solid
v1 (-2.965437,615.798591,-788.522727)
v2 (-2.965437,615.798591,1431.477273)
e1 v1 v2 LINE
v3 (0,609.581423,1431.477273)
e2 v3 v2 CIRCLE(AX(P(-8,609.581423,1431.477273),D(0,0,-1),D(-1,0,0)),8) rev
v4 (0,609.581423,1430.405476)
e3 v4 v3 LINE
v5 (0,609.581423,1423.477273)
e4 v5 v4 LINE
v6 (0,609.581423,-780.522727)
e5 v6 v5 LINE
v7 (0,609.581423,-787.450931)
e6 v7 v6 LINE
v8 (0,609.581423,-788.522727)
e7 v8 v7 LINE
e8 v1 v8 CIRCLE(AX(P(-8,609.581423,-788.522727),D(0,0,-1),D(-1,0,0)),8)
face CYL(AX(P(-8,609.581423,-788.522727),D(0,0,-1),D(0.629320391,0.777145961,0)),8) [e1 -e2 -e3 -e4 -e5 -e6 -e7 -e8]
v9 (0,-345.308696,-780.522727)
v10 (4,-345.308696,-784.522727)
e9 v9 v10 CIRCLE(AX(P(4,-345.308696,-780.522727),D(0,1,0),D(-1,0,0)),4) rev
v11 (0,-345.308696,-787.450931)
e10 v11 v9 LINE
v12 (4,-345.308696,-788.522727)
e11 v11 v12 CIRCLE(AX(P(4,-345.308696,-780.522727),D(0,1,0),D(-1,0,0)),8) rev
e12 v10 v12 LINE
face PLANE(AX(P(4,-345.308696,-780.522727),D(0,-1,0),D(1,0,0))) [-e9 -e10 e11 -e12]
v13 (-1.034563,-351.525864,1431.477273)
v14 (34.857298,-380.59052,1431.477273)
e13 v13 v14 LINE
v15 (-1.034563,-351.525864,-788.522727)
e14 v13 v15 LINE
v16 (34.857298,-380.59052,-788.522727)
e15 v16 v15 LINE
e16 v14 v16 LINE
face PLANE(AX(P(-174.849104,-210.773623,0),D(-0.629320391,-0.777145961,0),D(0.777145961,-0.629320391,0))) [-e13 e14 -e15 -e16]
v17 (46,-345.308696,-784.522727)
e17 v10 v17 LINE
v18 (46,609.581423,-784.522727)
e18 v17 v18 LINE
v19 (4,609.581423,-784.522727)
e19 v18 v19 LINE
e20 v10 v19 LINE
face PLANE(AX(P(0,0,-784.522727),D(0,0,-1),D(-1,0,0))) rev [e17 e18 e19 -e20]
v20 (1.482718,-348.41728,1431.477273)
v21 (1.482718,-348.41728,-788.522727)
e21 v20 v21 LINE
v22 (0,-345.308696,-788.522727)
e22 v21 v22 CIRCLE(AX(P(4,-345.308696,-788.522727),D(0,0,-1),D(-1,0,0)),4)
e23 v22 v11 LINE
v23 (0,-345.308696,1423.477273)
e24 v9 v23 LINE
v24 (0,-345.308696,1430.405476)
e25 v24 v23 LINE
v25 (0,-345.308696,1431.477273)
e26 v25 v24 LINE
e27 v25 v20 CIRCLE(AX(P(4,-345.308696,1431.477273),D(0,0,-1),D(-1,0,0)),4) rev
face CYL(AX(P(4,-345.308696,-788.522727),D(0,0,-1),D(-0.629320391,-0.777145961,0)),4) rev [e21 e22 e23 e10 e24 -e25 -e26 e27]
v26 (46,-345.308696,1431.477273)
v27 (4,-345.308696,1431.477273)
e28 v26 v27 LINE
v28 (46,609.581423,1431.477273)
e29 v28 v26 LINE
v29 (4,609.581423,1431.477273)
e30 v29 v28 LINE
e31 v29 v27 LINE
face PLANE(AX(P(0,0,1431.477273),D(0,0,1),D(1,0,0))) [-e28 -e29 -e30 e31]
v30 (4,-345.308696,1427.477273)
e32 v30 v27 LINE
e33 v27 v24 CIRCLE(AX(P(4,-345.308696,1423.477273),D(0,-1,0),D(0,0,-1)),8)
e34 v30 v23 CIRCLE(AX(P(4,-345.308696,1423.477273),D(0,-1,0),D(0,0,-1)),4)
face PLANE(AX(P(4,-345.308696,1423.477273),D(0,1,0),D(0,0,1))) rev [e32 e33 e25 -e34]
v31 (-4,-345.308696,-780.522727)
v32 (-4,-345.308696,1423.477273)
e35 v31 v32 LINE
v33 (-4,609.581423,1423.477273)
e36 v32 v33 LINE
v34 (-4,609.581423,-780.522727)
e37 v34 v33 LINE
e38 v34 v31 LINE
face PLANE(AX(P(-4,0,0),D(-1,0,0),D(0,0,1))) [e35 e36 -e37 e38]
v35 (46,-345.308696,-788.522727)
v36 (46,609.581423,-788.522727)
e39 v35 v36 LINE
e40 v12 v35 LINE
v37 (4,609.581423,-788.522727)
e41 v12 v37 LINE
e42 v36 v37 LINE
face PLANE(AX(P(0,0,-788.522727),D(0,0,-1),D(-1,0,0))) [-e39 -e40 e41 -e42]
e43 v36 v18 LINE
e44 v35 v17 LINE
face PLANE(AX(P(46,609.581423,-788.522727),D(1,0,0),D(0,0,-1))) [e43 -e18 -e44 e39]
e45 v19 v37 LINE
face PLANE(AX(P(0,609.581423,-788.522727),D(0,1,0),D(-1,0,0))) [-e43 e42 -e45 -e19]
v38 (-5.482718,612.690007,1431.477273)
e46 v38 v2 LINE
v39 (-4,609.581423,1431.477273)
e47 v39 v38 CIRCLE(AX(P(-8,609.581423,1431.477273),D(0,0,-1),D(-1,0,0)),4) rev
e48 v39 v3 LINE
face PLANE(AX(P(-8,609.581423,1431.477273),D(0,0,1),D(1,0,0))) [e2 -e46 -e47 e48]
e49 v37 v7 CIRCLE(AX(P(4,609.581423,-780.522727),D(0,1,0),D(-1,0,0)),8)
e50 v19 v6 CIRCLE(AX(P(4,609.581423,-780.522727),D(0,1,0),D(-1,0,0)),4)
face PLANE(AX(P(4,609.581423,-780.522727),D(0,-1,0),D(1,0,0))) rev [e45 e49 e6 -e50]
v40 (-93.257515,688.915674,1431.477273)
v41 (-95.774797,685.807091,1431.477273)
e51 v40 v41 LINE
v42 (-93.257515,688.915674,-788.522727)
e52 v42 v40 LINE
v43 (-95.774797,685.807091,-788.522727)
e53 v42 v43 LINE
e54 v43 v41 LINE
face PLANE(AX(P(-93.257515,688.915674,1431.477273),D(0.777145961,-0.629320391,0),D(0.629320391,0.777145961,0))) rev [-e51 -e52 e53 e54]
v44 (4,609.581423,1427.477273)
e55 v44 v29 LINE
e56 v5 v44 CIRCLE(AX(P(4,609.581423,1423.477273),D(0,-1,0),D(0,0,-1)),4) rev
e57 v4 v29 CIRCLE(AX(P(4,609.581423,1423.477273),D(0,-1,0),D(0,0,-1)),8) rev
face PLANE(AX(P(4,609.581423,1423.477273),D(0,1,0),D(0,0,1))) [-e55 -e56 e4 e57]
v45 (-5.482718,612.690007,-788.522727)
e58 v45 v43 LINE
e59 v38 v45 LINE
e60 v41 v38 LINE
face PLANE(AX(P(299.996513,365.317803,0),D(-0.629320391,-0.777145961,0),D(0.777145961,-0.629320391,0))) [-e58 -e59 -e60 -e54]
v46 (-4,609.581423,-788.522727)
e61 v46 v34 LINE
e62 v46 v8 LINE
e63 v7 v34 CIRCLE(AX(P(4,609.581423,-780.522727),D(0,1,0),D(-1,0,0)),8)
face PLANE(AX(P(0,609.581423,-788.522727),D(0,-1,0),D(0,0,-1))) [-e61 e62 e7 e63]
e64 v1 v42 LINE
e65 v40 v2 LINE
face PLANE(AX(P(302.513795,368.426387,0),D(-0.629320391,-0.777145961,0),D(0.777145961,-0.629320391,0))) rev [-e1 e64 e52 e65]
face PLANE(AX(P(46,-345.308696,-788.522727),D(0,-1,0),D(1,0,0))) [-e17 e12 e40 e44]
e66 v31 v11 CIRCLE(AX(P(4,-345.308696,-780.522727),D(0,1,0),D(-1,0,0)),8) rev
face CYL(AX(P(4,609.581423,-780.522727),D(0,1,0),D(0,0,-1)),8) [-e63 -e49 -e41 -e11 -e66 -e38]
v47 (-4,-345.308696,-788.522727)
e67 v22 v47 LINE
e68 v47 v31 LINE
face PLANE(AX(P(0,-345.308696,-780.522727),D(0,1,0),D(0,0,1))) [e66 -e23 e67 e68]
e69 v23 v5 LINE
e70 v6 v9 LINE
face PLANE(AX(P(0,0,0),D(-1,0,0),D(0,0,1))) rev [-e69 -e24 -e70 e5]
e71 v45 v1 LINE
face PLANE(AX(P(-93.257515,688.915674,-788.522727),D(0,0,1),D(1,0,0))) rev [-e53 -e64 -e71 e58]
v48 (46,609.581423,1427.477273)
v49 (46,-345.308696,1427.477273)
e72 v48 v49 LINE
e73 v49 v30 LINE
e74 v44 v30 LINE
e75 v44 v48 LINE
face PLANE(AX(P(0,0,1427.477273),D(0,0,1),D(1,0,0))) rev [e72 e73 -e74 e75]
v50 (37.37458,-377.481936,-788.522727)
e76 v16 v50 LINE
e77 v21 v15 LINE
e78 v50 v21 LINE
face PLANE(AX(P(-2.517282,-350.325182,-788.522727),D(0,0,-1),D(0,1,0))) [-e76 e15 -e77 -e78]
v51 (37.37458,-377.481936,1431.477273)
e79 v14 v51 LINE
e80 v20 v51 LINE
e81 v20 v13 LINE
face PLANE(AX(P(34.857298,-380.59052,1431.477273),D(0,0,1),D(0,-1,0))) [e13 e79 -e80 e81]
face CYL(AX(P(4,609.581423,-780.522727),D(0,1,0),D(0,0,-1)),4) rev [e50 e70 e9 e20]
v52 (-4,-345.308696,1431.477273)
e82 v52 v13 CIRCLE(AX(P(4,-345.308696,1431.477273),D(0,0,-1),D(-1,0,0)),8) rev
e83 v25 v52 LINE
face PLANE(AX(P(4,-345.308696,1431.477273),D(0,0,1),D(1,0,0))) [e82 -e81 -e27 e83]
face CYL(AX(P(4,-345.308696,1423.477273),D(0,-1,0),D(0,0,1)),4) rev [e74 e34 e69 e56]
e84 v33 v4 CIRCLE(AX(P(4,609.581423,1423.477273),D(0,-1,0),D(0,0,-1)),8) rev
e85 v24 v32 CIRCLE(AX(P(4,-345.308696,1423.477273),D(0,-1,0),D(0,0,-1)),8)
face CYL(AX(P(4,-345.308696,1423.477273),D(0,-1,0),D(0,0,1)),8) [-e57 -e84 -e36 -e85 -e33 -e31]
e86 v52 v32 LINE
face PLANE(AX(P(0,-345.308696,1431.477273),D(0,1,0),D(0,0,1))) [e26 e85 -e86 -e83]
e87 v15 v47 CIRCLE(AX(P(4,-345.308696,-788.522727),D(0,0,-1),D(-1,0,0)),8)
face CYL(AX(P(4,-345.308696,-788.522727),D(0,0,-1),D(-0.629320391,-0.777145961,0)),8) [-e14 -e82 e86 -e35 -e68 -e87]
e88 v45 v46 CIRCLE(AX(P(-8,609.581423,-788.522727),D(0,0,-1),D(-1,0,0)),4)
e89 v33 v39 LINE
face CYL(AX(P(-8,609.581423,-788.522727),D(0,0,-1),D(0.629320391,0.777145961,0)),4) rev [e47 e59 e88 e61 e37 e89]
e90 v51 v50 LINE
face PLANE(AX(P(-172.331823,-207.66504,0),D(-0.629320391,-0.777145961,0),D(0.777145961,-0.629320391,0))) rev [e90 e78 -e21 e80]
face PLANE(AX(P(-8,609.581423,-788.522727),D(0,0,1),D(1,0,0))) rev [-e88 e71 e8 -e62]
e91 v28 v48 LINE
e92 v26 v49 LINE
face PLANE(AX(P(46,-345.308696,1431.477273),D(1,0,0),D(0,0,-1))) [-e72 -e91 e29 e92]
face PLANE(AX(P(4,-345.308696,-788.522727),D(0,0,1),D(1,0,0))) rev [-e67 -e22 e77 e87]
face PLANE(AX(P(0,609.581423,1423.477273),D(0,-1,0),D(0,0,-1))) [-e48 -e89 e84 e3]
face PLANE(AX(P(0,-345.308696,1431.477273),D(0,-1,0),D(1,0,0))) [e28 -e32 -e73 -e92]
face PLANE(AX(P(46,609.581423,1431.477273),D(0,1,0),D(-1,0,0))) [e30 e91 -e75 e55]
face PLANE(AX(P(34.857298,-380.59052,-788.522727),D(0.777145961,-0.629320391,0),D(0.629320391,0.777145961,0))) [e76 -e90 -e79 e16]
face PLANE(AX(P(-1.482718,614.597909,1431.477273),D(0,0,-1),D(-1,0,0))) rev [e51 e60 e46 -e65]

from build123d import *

# Parameters (mm, degrees)
SKETCH1_W                    = 2220
SKETCH1_H                    = 969
BASE_FLANGE1_DEPTH           = 4
EDGE_FLANGE1_START           = -788.522727273
EDGE_FLANGE1_DEPTH           = 2220
EDGE_FLANGE1_2_DEPTH         = 2220
EDGE_FLANGE2_START           = -788.522727273
EDGE_FLANGE2_DEPTH           = 2220
EDGE_FLANGE2_2_DEPTH         = 2220
EDGE_FLANGE3_STRIP_W         = 24
EDGE_FLANGE3_STRIP_H         = 4
EDGE_FLANGE3_STRIP_CUT_DEPTH = 954.890119211
EDGE_FLANGE3_DEPTH           = 954.890119211
EDGE_FLANGE4_STRIP_W         = 24
EDGE_FLANGE4_STRIP_H         = 4
EDGE_FLANGE4_STRIP_CUT_DEPTH = 954.890119211
EDGE_FLANGE4_DEPTH           = 954.890119211
CUT_EXTRUDE1_DEPTH           = 1665.285512579
LPATTERN1_COUNT              = 7
LPATTERN1_PITCH              = 300
CUT_EXTRUDE2_DEPTH           = 1665.285512579
CUT_EXTRUDE2_DEPTH_BACK      = 1665.285512579
SKETCH20_R                   = 7
CUT_EXTRUDE3_DEPTH           = 2327.408738422
LPATTERN2_COUNT              = 5
LPATTERN2_PITCH              = 190
CUT_EXTRUDE4_DEPTH           = 1704.883654617
LPATTERN3_COUNT              = 7
LPATTERN3_PITCH              = 300


# Read off the part's stored shape, not the designer's step: Edge-Flange1, Edge-Flange2
# Sheet-metal steps are written as plain solids
with BuildPart() as part:
    # Sketch1 → Base-Flange1 (new body)
    with BuildSketch(Plane(origin=(0, 0, 0), x_dir=(0, 0, -1), z_dir=(1, 0, 0))):
        with Locations((-321.477272727, 132.136363636)):
            Rectangle(SKETCH1_W, SKETCH1_H)
    extrude(amount=-BASE_FLANGE1_DEPTH)

    # Edge-Flange1 outline → Edge-Flange1 (cut)
    with BuildSketch(Plane.XY.offset(EDGE_FLANGE1_START)):
        with BuildLine():
            Line((-4, 616.636363636), (-2.965436872, 615.798590934))
            ThreePointArc((-2.965436872, 615.798590934), (-0.779317725, 613.025512017), (0, 609.581423242))
            Line((0, 609.581423242), (0, 616.636363636))
            Line((0, 616.636363636), (-4, 616.636363636))
        make_face()
    extrude(amount=EDGE_FLANGE1_DEPTH, mode=Mode.SUBTRACT)

    # Edge-Flange1 2 outline → Edge-Flange1 2 (add)
    with BuildSketch(Plane.XY.offset(EDGE_FLANGE1_START)):
        with BuildLine():
            Line((-4, 609.581423242), (-4, 616.636363636))
            Line((-4, 616.636363636), (-93.257515375, 688.91567443))
            Line((-93.257515375, 688.91567443), (-95.774796939, 685.807090584))
            Line((-95.774796939, 685.807090584), (-5.482718436, 612.690007088))
            ThreePointArc((-5.482718436, 612.690007088), (-4.389658863, 611.303467629), (-4, 609.581423242))
        make_face()
    extrude(amount=EDGE_FLANGE1_2_DEPTH)

    # Edge-Flange2 outline → Edge-Flange2 (cut)
    with BuildSketch(Plane.XY.offset(EDGE_FLANGE2_START)):
        with BuildLine():
            Line((0, -352.363636364), (-1.034563128, -351.525863661))
            ThreePointArc((-1.034563128, -351.525863661), (-3.220682275, -348.752784744), (-4, -345.308695969))
            Line((-4, -345.308695969), (-4, -352.363636364))
            Line((-4, -352.363636364), (0, -352.363636364))
        make_face()
    extrude(amount=EDGE_FLANGE2_DEPTH, mode=Mode.SUBTRACT)

    # Edge-Flange2 2 outline → Edge-Flange2 2 (add)
    with BuildSketch(Plane.XY.offset(EDGE_FLANGE2_START)):
        with BuildLine():
            Line((0, -345.308695969), (0, -352.363636364))
            Line((0, -352.363636364), (34.857298073, -380.590519783))
            Line((34.857298073, -380.590519783), (37.374579637, -377.481935938))
            Line((37.374579637, -377.481935938), (1.482718436, -348.417279815))
            ThreePointArc((1.482718436, -348.417279815), (0.389658863, -347.030740356), (0, -345.308695969))
        make_face()
    extrude(amount=EDGE_FLANGE2_2_DEPTH)

    # Edge-Flange3 strip (across the edge) → Edge-Flange3 strip cut (cut)
    with BuildSketch(Plane(origin=(0, 609.581423242, 1431.477272727), x_dir=(0, 0, -1), z_dir=(0, -1, 0))):
        with Locations((-4, -2)):
            Rectangle(EDGE_FLANGE3_STRIP_W, EDGE_FLANGE3_STRIP_H)
    extrude(amount=EDGE_FLANGE3_STRIP_CUT_DEPTH, mode=Mode.SUBTRACT)

    # Edge-Flange3 section (across the edge) → Edge-Flange3 (add)
    with BuildSketch(Plane(origin=(0, 609.581423242, 1431.477272727), x_dir=(0, 0, -1), z_dir=(0, -1, 0))):
        with BuildLine():
            Line((0, 4), (0, 46))
            Line((0, 46), (4, 46))
            Line((4, 46), (4, 4))
            ThreePointArc((4, 4), (5.171572875, 1.171572875), (8, 0))
            Line((8, 0), (8, -4))
            ThreePointArc((8, -4), (2.343145751, -1.656854249), (0, 4))
        make_face()
    extrude(amount=EDGE_FLANGE3_DEPTH)

    # Edge-Flange4 strip (across the edge) → Edge-Flange4 strip cut (cut)
    with BuildSketch(Plane(origin=(0, -345.308695969, -788.522727273), x_dir=(0, 0, 1), z_dir=(0, 1, 0))):
        with Locations((-4, -2)):
            Rectangle(EDGE_FLANGE4_STRIP_W, EDGE_FLANGE4_STRIP_H)
    extrude(amount=EDGE_FLANGE4_STRIP_CUT_DEPTH, mode=Mode.SUBTRACT)

    # Edge-Flange4 section (across the edge) → Edge-Flange4 (add)
    with BuildSketch(Plane(origin=(0, -345.308695969, -788.522727273), x_dir=(0, 0, 1), z_dir=(0, 1, 0))):
        with BuildLine():
            Line((0, 4), (0, 46))
            Line((0, 46), (4, 46))
            Line((4, 46), (4, 4))
            ThreePointArc((4, 4), (5.171572875, 1.171572875), (8, 0))
            Line((8, 0), (8, -4))
            ThreePointArc((8, -4), (2.343145751, -1.656854249), (0, 4))
        make_face()
    extrude(amount=EDGE_FLANGE4_DEPTH)

    # Sketch18 → Cut-Extrude1 (cut, symmetric)
    with BuildSketch(Plane(origin=(299.99651319, 370.464841108, 0), x_dir=(0.7771459614569677, -0.6293203910498413, 0), z_dir=(0.6293203910498414, 0.7771459614569678, 0))):
        with BuildLine():
            Line((-524.023383081, 943.522727273), (-524.023383081, 933.522727273))
            ThreePointArc((-524.023383081, 933.522727273), (-531.023383081, 926.522727273), (-538.023383081, 933.522727273))
            Line((-538.023383081, 933.522727273), (-538.023383081, 943.522727273))
            ThreePointArc((-538.023383081, 943.522727273), (-531.023383081, 950.522727273), (-524.023383081, 943.522727273))
        make_face()
    cut_extrude1 = extrude(amount=CUT_EXTRUDE1_DEPTH, both=True, mode=Mode.SUBTRACT)

    # LPattern1: Cut-Extrude1 ×7
    with Locations(*[(0, 0, i * LPATTERN1_PITCH) for i in range(1, LPATTERN1_COUNT)]):
        add(cut_extrude1, mode=Mode.SUBTRACT)

    # Sketch19 → Cut-Extrude2 (cut, two sides: drawn at the far end of the back side and taken through both)
    with BuildSketch(Plane(origin=(299.99651319, 370.464841108, 0), x_dir=(0.7771459614569677, -0.6293203910498413, 0), z_dir=(0.6293203910498414, 0.7771459614569678, 0)).offset(-CUT_EXTRUDE2_DEPTH_BACK)):
        with BuildLine():
            Line((484.914799236, -1336.477272727), (484.914799236, -1346.477272727))
            ThreePointArc((484.914799236, -1346.477272727), (477.914799236, -1353.477272727), (470.914799236, -1346.477272727))
            Line((470.914799236, -1346.477272727), (470.914799236, -1336.477272727))
            ThreePointArc((470.914799236, -1336.477272727), (477.914799236, -1329.477272727), (484.914799236, -1336.477272727))
        make_face()
    extrude(amount=CUT_EXTRUDE2_DEPTH + CUT_EXTRUDE2_DEPTH_BACK, mode=Mode.SUBTRACT)

    # Sketch20 → Cut-Extrude3 (cut, symmetric)
    with BuildSketch(Plane.XY.offset(1431.477272727)):
        with Locations((71, -246.525863661)):
            Circle(SKETCH20_R)
    cut_extrude3 = extrude(amount=CUT_EXTRUDE3_DEPTH, both=True, mode=Mode.SUBTRACT)

    # LPattern2: Cut-Extrude3 ×5
    with Locations(*[(0, -i * LPATTERN2_PITCH, 0) for i in range(1, LPATTERN2_COUNT)]):
        add(cut_extrude3, mode=Mode.SUBTRACT)

    # Sketch21 → Cut-Extrude4 (cut, symmetric)
    with BuildSketch(Plane(origin=(-169.814541183, -209.703494046, 0), x_dir=(0.7771459614569678, -0.6293203910498414, 0), z_dir=(0.6293203910498414, 0.7771459614569678, 0))):
        with BuildLine():
            Line((298.602583165, 943.522727273), (298.602583165, 933.522727273))
            ThreePointArc((298.602583165, 933.522727273), (291.602583165, 926.522727273), (284.602583165, 933.522727273))
            Line((284.602583165, 933.522727273), (284.602583165, 943.522727273))
            ThreePointArc((284.602583165, 943.522727273), (291.602583165, 950.522727273), (298.602583165, 943.522727273))
        make_face()
    cut_extrude4 = extrude(amount=CUT_EXTRUDE4_DEPTH, both=True, mode=Mode.SUBTRACT)

    # LPattern3: Cut-Extrude4 ×7
    with Locations(*[(0, 0, i * LPATTERN3_PITCH) for i in range(1, LPATTERN3_COUNT)]):
        add(cut_extrude4, mode=Mode.SUBTRACT)


solid = part.part
